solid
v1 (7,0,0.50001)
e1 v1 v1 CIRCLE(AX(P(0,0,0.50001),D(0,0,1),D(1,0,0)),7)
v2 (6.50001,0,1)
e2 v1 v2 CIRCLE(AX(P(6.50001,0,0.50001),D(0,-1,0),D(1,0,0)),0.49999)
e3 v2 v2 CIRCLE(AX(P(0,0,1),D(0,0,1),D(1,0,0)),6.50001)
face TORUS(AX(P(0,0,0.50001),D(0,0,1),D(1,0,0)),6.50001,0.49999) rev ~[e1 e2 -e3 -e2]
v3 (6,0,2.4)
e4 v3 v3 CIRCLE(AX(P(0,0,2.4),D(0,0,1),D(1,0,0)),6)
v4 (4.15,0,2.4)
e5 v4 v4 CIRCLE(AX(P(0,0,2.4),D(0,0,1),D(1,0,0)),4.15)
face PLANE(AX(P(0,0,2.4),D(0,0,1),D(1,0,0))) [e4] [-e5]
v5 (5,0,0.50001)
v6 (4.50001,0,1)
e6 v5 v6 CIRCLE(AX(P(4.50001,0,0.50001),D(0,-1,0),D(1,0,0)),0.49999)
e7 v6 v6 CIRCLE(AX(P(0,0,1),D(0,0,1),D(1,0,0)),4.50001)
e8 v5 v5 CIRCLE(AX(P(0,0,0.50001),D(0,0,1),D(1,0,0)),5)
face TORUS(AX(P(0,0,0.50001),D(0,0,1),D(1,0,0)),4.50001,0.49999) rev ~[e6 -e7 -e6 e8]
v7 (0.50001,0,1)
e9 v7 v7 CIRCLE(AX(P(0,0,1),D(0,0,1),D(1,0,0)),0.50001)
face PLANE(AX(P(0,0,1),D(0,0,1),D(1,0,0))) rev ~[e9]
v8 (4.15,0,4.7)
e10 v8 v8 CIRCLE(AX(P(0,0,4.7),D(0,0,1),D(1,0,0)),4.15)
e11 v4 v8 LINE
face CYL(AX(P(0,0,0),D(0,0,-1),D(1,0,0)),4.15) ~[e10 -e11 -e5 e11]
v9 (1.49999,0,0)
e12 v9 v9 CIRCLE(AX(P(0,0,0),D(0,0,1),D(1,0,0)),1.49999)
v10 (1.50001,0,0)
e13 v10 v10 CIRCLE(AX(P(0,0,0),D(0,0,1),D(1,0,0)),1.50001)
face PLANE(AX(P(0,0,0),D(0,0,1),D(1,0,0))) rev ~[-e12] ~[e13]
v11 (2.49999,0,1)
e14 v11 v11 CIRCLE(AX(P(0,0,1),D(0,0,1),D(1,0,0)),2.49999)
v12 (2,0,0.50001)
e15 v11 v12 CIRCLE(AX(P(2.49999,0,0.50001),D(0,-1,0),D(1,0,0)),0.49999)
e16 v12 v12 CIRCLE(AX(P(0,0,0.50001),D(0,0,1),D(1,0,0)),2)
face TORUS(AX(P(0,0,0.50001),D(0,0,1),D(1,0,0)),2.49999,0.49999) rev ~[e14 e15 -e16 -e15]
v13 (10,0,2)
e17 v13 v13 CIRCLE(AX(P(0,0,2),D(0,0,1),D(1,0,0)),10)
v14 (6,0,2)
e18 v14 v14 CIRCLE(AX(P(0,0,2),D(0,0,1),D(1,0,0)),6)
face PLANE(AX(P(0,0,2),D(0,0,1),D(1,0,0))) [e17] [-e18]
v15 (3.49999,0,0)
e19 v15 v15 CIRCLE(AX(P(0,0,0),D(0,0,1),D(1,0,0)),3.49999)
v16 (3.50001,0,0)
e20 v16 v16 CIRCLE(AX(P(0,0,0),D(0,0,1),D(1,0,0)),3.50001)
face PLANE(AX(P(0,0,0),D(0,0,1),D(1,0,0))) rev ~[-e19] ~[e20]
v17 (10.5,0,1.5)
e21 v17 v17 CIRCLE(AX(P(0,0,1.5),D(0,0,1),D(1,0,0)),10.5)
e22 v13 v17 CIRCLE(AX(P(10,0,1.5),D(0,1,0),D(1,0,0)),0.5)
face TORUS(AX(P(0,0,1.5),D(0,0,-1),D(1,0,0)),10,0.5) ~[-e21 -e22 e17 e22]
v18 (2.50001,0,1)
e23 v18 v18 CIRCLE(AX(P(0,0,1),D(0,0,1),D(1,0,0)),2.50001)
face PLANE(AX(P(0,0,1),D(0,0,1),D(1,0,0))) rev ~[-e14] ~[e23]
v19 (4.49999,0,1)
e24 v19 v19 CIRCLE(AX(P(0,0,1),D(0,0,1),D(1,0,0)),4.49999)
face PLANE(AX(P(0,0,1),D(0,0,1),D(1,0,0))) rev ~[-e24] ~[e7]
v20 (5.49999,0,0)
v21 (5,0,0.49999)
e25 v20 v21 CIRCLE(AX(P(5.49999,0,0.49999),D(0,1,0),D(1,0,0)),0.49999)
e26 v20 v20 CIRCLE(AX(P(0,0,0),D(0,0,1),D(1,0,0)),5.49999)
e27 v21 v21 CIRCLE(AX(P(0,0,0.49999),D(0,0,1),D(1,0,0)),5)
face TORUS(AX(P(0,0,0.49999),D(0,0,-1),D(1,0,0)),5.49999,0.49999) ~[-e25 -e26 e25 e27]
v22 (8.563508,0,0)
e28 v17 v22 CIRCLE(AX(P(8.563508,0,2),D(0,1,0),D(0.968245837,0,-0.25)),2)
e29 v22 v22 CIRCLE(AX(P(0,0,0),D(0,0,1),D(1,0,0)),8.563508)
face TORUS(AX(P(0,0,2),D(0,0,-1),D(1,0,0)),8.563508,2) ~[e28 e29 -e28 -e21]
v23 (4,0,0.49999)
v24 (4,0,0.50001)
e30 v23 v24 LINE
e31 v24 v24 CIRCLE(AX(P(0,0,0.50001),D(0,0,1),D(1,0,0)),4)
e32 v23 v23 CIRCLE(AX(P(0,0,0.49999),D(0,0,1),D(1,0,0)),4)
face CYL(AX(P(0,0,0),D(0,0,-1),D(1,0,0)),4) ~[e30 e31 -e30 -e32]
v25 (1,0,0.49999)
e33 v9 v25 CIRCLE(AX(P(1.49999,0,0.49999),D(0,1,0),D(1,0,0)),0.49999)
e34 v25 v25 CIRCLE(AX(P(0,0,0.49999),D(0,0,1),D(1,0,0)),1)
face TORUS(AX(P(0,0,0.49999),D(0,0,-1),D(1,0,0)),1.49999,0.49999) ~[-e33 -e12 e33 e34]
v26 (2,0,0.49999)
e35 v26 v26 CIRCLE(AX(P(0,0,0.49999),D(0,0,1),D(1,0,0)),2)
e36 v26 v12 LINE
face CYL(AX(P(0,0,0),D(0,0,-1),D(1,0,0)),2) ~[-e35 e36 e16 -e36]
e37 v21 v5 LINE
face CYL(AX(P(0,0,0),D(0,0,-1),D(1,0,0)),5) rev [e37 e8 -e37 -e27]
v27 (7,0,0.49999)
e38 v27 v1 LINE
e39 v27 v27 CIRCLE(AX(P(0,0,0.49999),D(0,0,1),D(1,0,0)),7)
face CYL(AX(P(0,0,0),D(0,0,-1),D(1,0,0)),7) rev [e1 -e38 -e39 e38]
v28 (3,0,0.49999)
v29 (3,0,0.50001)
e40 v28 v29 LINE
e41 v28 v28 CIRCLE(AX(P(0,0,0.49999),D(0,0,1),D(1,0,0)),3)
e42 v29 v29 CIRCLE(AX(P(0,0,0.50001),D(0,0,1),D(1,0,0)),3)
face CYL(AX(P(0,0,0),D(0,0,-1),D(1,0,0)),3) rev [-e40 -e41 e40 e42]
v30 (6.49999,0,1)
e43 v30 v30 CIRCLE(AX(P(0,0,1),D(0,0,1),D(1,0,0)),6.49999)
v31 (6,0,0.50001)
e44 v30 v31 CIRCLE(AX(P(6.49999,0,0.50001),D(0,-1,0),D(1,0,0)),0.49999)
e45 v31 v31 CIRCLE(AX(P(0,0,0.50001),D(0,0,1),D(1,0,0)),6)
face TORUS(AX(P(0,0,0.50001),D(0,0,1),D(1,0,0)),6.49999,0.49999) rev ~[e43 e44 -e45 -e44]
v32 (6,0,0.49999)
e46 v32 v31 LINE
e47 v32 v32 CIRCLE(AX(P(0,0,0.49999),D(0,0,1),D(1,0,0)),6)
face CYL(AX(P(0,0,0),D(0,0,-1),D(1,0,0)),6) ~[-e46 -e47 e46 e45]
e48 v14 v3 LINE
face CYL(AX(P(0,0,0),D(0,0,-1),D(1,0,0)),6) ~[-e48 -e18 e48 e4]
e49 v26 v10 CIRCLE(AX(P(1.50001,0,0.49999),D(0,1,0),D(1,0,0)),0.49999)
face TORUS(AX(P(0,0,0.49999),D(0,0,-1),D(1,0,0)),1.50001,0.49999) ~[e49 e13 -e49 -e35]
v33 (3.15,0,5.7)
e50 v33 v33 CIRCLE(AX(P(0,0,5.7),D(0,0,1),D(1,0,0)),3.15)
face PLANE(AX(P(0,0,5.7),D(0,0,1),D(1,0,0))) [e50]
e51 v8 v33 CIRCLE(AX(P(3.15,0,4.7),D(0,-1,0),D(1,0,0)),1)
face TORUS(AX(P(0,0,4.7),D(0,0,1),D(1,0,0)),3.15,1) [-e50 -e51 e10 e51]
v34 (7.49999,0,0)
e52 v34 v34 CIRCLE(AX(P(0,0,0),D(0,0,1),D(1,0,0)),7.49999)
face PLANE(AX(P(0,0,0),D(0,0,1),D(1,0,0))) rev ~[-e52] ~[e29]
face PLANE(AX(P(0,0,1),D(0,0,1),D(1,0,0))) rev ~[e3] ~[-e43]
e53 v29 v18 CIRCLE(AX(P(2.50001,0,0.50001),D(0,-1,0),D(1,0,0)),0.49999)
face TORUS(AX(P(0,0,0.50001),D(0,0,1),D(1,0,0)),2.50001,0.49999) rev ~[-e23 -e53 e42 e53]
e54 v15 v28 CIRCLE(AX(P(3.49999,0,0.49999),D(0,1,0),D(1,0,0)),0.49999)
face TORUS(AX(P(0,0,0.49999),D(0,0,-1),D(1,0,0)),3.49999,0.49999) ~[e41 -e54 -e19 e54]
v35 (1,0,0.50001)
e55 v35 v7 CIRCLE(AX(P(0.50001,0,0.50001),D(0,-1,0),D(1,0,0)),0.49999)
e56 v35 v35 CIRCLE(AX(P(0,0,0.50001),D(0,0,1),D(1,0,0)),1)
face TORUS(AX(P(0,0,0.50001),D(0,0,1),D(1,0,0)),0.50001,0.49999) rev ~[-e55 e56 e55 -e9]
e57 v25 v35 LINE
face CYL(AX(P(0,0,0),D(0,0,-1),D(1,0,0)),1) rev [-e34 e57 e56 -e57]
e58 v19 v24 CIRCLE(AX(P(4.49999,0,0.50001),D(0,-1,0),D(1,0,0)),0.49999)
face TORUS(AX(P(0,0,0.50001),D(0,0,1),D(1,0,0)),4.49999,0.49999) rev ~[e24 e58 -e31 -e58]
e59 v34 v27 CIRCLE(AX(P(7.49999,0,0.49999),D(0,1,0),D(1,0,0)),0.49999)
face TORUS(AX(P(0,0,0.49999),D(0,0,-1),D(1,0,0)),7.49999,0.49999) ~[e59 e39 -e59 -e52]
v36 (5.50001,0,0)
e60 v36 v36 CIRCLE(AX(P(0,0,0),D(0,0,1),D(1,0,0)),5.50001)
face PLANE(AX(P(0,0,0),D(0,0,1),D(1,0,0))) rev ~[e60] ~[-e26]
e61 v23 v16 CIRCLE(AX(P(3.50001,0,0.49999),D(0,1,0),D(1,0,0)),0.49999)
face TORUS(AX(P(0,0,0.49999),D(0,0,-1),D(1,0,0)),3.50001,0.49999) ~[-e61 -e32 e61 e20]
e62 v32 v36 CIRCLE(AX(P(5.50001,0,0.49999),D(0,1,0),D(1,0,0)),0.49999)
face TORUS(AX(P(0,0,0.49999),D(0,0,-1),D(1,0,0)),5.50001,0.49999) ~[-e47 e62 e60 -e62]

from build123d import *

# Parameters (mm, degrees)
F0_R     = 10.5
F0_R_2   = 6
F1_DEPTH = 2
F0_R_3   = 4.15
F2_DEPTH = 2.4
F3_DEPTH = 5.7
F4_R     = 1
F5_R     = 0.5
F7_R     = 7
F7_R_2   = 6.5
F7_R_3   = 6
F7_R_4   = 5
F7_R_5   = 4.5
F7_R_6   = 4.15
F7_R_7   = 4
F7_R_8   = 3
F7_R_9   = 2.5
F7_R_10  = 2
F7_R_11  = 1
F7_R_12  = 0.5
F8_DEPTH = 1
F9_R     = 0.49999
F10_R    = 0.49999


# Not quite as in the source:
# - a fillet or chamfer that OpenCascade refuses, or shapes differently, is made with other operations: its cross-section is extruded or revolved along the edge and cut away or added
# - a fillet or chamfer is up to 0.001 mm smaller than in the source, because OpenCascade refuses the exact size


with BuildPart() as f1:
    # F0 (on Top) → F1 (new body)
    with BuildSketch(Plane.XY):
        Circle(F0_R)
        Circle(F0_R_2, mode=Mode.SUBTRACT)
    extrude(amount=F1_DEPTH)

    # F0 (on Top) → F2 (join)
    with BuildSketch(Plane.XY):
        Circle(F0_R_2)
        Circle(F0_R_3, mode=Mode.SUBTRACT)
    extrude(amount=F2_DEPTH)

    # F0 (on Top) → F3 (join)
    with BuildSketch(Plane.XY):
        Circle(F0_R_3)
    extrude(amount=F3_DEPTH)

    # F4
    f4_edges = [f1.edges().sort_by_distance(p)[0] for p in [
        (-4.15, 0, 5.7),
    ]]
    fillet(f4_edges, radius=F4_R)

    # F5
    f5_edges = [f1.edges().sort_by_distance(p)[0] for p in [
        (-10.5, 0, 2),
    ]]
    fillet(f5_edges, radius=F5_R)

    # F6: fillet of radius 2 on 1 edges, made by hand

    # F6_s1 → F6_t2 (revolve, cut)
    with BuildSketch(Plane.XZ):
        with BuildLine():
            ThreePointArc((10.5, 1.5), (9.7882531983, 0.4188611699), (8.5635083269, 0))
            Line((8.5635083269, 0), (8.5635083269, -0.04))
            Line((8.5635083269, -0.04), (10.5, -0.04))
            Line((10.5, -0.04), (10.54, 0))
            ThreePointArc((10.54, 0), (10.54, 0.75), (10.5387298335, 1.49))
            Line((10.5387298335, 1.49), (10.5, 1.5))
        make_face()
    revolve(axis=Axis((0, 0, 0), (0, 0, 1)), mode=Mode.SUBTRACT)

    # F7 (on face) → F8 (cut)
    with BuildSketch(Plane.XY):
        Circle(F7_R)
        Circle(F7_R_2, mode=Mode.SUBTRACT)
        Circle(F7_R_2)
        Circle(F7_R_3, mode=Mode.SUBTRACT)
        Circle(F7_R_4)
        Circle(F7_R_5, mode=Mode.SUBTRACT)
        Circle(F7_R_5)
        Circle(F7_R_6, mode=Mode.SUBTRACT)
        Circle(F7_R_6)
        Circle(F7_R_7, mode=Mode.SUBTRACT)
        Circle(F7_R_8)
        Circle(F7_R_9, mode=Mode.SUBTRACT)
        Circle(F7_R_9)
        Circle(F7_R_10, mode=Mode.SUBTRACT)
        Circle(F7_R_11)
        Circle(F7_R_12, mode=Mode.SUBTRACT)
        Circle(F7_R_12)
    extrude(amount=F8_DEPTH, mode=Mode.SUBTRACT)

    # F9 (radius 0.5 in the source; OpenCascade refuses exactly that, so slightly less here)
    f9_edges = [f1.edges().sort_by_distance(p)[0] for p in [
        (-1, 0, 0),
        (-2, 0, 0),
        (-3, 0, 0),
        (-4, 0, 0),
        (-6, 0, 0),
        (-5, 0, 0),
        (-7, 0, 0),
    ]]
    fillet(f9_edges, radius=F9_R)

    # F10 (radius 0.5 in the source; OpenCascade refuses exactly that, so slightly less here)
    f10_edges = [f1.edges().sort_by_distance(p)[0] for p in [
        (-6, 0, 1),
        (-7, 0, 1),
        (-4, 0, 1),
        (-5, 0, 1),
        (-2, 0, 1),
        (-3, 0, 1),
        (-1, 0, 1),
    ]]
    fillet(f10_edges, radius=F10_R)


solid = f1.part
